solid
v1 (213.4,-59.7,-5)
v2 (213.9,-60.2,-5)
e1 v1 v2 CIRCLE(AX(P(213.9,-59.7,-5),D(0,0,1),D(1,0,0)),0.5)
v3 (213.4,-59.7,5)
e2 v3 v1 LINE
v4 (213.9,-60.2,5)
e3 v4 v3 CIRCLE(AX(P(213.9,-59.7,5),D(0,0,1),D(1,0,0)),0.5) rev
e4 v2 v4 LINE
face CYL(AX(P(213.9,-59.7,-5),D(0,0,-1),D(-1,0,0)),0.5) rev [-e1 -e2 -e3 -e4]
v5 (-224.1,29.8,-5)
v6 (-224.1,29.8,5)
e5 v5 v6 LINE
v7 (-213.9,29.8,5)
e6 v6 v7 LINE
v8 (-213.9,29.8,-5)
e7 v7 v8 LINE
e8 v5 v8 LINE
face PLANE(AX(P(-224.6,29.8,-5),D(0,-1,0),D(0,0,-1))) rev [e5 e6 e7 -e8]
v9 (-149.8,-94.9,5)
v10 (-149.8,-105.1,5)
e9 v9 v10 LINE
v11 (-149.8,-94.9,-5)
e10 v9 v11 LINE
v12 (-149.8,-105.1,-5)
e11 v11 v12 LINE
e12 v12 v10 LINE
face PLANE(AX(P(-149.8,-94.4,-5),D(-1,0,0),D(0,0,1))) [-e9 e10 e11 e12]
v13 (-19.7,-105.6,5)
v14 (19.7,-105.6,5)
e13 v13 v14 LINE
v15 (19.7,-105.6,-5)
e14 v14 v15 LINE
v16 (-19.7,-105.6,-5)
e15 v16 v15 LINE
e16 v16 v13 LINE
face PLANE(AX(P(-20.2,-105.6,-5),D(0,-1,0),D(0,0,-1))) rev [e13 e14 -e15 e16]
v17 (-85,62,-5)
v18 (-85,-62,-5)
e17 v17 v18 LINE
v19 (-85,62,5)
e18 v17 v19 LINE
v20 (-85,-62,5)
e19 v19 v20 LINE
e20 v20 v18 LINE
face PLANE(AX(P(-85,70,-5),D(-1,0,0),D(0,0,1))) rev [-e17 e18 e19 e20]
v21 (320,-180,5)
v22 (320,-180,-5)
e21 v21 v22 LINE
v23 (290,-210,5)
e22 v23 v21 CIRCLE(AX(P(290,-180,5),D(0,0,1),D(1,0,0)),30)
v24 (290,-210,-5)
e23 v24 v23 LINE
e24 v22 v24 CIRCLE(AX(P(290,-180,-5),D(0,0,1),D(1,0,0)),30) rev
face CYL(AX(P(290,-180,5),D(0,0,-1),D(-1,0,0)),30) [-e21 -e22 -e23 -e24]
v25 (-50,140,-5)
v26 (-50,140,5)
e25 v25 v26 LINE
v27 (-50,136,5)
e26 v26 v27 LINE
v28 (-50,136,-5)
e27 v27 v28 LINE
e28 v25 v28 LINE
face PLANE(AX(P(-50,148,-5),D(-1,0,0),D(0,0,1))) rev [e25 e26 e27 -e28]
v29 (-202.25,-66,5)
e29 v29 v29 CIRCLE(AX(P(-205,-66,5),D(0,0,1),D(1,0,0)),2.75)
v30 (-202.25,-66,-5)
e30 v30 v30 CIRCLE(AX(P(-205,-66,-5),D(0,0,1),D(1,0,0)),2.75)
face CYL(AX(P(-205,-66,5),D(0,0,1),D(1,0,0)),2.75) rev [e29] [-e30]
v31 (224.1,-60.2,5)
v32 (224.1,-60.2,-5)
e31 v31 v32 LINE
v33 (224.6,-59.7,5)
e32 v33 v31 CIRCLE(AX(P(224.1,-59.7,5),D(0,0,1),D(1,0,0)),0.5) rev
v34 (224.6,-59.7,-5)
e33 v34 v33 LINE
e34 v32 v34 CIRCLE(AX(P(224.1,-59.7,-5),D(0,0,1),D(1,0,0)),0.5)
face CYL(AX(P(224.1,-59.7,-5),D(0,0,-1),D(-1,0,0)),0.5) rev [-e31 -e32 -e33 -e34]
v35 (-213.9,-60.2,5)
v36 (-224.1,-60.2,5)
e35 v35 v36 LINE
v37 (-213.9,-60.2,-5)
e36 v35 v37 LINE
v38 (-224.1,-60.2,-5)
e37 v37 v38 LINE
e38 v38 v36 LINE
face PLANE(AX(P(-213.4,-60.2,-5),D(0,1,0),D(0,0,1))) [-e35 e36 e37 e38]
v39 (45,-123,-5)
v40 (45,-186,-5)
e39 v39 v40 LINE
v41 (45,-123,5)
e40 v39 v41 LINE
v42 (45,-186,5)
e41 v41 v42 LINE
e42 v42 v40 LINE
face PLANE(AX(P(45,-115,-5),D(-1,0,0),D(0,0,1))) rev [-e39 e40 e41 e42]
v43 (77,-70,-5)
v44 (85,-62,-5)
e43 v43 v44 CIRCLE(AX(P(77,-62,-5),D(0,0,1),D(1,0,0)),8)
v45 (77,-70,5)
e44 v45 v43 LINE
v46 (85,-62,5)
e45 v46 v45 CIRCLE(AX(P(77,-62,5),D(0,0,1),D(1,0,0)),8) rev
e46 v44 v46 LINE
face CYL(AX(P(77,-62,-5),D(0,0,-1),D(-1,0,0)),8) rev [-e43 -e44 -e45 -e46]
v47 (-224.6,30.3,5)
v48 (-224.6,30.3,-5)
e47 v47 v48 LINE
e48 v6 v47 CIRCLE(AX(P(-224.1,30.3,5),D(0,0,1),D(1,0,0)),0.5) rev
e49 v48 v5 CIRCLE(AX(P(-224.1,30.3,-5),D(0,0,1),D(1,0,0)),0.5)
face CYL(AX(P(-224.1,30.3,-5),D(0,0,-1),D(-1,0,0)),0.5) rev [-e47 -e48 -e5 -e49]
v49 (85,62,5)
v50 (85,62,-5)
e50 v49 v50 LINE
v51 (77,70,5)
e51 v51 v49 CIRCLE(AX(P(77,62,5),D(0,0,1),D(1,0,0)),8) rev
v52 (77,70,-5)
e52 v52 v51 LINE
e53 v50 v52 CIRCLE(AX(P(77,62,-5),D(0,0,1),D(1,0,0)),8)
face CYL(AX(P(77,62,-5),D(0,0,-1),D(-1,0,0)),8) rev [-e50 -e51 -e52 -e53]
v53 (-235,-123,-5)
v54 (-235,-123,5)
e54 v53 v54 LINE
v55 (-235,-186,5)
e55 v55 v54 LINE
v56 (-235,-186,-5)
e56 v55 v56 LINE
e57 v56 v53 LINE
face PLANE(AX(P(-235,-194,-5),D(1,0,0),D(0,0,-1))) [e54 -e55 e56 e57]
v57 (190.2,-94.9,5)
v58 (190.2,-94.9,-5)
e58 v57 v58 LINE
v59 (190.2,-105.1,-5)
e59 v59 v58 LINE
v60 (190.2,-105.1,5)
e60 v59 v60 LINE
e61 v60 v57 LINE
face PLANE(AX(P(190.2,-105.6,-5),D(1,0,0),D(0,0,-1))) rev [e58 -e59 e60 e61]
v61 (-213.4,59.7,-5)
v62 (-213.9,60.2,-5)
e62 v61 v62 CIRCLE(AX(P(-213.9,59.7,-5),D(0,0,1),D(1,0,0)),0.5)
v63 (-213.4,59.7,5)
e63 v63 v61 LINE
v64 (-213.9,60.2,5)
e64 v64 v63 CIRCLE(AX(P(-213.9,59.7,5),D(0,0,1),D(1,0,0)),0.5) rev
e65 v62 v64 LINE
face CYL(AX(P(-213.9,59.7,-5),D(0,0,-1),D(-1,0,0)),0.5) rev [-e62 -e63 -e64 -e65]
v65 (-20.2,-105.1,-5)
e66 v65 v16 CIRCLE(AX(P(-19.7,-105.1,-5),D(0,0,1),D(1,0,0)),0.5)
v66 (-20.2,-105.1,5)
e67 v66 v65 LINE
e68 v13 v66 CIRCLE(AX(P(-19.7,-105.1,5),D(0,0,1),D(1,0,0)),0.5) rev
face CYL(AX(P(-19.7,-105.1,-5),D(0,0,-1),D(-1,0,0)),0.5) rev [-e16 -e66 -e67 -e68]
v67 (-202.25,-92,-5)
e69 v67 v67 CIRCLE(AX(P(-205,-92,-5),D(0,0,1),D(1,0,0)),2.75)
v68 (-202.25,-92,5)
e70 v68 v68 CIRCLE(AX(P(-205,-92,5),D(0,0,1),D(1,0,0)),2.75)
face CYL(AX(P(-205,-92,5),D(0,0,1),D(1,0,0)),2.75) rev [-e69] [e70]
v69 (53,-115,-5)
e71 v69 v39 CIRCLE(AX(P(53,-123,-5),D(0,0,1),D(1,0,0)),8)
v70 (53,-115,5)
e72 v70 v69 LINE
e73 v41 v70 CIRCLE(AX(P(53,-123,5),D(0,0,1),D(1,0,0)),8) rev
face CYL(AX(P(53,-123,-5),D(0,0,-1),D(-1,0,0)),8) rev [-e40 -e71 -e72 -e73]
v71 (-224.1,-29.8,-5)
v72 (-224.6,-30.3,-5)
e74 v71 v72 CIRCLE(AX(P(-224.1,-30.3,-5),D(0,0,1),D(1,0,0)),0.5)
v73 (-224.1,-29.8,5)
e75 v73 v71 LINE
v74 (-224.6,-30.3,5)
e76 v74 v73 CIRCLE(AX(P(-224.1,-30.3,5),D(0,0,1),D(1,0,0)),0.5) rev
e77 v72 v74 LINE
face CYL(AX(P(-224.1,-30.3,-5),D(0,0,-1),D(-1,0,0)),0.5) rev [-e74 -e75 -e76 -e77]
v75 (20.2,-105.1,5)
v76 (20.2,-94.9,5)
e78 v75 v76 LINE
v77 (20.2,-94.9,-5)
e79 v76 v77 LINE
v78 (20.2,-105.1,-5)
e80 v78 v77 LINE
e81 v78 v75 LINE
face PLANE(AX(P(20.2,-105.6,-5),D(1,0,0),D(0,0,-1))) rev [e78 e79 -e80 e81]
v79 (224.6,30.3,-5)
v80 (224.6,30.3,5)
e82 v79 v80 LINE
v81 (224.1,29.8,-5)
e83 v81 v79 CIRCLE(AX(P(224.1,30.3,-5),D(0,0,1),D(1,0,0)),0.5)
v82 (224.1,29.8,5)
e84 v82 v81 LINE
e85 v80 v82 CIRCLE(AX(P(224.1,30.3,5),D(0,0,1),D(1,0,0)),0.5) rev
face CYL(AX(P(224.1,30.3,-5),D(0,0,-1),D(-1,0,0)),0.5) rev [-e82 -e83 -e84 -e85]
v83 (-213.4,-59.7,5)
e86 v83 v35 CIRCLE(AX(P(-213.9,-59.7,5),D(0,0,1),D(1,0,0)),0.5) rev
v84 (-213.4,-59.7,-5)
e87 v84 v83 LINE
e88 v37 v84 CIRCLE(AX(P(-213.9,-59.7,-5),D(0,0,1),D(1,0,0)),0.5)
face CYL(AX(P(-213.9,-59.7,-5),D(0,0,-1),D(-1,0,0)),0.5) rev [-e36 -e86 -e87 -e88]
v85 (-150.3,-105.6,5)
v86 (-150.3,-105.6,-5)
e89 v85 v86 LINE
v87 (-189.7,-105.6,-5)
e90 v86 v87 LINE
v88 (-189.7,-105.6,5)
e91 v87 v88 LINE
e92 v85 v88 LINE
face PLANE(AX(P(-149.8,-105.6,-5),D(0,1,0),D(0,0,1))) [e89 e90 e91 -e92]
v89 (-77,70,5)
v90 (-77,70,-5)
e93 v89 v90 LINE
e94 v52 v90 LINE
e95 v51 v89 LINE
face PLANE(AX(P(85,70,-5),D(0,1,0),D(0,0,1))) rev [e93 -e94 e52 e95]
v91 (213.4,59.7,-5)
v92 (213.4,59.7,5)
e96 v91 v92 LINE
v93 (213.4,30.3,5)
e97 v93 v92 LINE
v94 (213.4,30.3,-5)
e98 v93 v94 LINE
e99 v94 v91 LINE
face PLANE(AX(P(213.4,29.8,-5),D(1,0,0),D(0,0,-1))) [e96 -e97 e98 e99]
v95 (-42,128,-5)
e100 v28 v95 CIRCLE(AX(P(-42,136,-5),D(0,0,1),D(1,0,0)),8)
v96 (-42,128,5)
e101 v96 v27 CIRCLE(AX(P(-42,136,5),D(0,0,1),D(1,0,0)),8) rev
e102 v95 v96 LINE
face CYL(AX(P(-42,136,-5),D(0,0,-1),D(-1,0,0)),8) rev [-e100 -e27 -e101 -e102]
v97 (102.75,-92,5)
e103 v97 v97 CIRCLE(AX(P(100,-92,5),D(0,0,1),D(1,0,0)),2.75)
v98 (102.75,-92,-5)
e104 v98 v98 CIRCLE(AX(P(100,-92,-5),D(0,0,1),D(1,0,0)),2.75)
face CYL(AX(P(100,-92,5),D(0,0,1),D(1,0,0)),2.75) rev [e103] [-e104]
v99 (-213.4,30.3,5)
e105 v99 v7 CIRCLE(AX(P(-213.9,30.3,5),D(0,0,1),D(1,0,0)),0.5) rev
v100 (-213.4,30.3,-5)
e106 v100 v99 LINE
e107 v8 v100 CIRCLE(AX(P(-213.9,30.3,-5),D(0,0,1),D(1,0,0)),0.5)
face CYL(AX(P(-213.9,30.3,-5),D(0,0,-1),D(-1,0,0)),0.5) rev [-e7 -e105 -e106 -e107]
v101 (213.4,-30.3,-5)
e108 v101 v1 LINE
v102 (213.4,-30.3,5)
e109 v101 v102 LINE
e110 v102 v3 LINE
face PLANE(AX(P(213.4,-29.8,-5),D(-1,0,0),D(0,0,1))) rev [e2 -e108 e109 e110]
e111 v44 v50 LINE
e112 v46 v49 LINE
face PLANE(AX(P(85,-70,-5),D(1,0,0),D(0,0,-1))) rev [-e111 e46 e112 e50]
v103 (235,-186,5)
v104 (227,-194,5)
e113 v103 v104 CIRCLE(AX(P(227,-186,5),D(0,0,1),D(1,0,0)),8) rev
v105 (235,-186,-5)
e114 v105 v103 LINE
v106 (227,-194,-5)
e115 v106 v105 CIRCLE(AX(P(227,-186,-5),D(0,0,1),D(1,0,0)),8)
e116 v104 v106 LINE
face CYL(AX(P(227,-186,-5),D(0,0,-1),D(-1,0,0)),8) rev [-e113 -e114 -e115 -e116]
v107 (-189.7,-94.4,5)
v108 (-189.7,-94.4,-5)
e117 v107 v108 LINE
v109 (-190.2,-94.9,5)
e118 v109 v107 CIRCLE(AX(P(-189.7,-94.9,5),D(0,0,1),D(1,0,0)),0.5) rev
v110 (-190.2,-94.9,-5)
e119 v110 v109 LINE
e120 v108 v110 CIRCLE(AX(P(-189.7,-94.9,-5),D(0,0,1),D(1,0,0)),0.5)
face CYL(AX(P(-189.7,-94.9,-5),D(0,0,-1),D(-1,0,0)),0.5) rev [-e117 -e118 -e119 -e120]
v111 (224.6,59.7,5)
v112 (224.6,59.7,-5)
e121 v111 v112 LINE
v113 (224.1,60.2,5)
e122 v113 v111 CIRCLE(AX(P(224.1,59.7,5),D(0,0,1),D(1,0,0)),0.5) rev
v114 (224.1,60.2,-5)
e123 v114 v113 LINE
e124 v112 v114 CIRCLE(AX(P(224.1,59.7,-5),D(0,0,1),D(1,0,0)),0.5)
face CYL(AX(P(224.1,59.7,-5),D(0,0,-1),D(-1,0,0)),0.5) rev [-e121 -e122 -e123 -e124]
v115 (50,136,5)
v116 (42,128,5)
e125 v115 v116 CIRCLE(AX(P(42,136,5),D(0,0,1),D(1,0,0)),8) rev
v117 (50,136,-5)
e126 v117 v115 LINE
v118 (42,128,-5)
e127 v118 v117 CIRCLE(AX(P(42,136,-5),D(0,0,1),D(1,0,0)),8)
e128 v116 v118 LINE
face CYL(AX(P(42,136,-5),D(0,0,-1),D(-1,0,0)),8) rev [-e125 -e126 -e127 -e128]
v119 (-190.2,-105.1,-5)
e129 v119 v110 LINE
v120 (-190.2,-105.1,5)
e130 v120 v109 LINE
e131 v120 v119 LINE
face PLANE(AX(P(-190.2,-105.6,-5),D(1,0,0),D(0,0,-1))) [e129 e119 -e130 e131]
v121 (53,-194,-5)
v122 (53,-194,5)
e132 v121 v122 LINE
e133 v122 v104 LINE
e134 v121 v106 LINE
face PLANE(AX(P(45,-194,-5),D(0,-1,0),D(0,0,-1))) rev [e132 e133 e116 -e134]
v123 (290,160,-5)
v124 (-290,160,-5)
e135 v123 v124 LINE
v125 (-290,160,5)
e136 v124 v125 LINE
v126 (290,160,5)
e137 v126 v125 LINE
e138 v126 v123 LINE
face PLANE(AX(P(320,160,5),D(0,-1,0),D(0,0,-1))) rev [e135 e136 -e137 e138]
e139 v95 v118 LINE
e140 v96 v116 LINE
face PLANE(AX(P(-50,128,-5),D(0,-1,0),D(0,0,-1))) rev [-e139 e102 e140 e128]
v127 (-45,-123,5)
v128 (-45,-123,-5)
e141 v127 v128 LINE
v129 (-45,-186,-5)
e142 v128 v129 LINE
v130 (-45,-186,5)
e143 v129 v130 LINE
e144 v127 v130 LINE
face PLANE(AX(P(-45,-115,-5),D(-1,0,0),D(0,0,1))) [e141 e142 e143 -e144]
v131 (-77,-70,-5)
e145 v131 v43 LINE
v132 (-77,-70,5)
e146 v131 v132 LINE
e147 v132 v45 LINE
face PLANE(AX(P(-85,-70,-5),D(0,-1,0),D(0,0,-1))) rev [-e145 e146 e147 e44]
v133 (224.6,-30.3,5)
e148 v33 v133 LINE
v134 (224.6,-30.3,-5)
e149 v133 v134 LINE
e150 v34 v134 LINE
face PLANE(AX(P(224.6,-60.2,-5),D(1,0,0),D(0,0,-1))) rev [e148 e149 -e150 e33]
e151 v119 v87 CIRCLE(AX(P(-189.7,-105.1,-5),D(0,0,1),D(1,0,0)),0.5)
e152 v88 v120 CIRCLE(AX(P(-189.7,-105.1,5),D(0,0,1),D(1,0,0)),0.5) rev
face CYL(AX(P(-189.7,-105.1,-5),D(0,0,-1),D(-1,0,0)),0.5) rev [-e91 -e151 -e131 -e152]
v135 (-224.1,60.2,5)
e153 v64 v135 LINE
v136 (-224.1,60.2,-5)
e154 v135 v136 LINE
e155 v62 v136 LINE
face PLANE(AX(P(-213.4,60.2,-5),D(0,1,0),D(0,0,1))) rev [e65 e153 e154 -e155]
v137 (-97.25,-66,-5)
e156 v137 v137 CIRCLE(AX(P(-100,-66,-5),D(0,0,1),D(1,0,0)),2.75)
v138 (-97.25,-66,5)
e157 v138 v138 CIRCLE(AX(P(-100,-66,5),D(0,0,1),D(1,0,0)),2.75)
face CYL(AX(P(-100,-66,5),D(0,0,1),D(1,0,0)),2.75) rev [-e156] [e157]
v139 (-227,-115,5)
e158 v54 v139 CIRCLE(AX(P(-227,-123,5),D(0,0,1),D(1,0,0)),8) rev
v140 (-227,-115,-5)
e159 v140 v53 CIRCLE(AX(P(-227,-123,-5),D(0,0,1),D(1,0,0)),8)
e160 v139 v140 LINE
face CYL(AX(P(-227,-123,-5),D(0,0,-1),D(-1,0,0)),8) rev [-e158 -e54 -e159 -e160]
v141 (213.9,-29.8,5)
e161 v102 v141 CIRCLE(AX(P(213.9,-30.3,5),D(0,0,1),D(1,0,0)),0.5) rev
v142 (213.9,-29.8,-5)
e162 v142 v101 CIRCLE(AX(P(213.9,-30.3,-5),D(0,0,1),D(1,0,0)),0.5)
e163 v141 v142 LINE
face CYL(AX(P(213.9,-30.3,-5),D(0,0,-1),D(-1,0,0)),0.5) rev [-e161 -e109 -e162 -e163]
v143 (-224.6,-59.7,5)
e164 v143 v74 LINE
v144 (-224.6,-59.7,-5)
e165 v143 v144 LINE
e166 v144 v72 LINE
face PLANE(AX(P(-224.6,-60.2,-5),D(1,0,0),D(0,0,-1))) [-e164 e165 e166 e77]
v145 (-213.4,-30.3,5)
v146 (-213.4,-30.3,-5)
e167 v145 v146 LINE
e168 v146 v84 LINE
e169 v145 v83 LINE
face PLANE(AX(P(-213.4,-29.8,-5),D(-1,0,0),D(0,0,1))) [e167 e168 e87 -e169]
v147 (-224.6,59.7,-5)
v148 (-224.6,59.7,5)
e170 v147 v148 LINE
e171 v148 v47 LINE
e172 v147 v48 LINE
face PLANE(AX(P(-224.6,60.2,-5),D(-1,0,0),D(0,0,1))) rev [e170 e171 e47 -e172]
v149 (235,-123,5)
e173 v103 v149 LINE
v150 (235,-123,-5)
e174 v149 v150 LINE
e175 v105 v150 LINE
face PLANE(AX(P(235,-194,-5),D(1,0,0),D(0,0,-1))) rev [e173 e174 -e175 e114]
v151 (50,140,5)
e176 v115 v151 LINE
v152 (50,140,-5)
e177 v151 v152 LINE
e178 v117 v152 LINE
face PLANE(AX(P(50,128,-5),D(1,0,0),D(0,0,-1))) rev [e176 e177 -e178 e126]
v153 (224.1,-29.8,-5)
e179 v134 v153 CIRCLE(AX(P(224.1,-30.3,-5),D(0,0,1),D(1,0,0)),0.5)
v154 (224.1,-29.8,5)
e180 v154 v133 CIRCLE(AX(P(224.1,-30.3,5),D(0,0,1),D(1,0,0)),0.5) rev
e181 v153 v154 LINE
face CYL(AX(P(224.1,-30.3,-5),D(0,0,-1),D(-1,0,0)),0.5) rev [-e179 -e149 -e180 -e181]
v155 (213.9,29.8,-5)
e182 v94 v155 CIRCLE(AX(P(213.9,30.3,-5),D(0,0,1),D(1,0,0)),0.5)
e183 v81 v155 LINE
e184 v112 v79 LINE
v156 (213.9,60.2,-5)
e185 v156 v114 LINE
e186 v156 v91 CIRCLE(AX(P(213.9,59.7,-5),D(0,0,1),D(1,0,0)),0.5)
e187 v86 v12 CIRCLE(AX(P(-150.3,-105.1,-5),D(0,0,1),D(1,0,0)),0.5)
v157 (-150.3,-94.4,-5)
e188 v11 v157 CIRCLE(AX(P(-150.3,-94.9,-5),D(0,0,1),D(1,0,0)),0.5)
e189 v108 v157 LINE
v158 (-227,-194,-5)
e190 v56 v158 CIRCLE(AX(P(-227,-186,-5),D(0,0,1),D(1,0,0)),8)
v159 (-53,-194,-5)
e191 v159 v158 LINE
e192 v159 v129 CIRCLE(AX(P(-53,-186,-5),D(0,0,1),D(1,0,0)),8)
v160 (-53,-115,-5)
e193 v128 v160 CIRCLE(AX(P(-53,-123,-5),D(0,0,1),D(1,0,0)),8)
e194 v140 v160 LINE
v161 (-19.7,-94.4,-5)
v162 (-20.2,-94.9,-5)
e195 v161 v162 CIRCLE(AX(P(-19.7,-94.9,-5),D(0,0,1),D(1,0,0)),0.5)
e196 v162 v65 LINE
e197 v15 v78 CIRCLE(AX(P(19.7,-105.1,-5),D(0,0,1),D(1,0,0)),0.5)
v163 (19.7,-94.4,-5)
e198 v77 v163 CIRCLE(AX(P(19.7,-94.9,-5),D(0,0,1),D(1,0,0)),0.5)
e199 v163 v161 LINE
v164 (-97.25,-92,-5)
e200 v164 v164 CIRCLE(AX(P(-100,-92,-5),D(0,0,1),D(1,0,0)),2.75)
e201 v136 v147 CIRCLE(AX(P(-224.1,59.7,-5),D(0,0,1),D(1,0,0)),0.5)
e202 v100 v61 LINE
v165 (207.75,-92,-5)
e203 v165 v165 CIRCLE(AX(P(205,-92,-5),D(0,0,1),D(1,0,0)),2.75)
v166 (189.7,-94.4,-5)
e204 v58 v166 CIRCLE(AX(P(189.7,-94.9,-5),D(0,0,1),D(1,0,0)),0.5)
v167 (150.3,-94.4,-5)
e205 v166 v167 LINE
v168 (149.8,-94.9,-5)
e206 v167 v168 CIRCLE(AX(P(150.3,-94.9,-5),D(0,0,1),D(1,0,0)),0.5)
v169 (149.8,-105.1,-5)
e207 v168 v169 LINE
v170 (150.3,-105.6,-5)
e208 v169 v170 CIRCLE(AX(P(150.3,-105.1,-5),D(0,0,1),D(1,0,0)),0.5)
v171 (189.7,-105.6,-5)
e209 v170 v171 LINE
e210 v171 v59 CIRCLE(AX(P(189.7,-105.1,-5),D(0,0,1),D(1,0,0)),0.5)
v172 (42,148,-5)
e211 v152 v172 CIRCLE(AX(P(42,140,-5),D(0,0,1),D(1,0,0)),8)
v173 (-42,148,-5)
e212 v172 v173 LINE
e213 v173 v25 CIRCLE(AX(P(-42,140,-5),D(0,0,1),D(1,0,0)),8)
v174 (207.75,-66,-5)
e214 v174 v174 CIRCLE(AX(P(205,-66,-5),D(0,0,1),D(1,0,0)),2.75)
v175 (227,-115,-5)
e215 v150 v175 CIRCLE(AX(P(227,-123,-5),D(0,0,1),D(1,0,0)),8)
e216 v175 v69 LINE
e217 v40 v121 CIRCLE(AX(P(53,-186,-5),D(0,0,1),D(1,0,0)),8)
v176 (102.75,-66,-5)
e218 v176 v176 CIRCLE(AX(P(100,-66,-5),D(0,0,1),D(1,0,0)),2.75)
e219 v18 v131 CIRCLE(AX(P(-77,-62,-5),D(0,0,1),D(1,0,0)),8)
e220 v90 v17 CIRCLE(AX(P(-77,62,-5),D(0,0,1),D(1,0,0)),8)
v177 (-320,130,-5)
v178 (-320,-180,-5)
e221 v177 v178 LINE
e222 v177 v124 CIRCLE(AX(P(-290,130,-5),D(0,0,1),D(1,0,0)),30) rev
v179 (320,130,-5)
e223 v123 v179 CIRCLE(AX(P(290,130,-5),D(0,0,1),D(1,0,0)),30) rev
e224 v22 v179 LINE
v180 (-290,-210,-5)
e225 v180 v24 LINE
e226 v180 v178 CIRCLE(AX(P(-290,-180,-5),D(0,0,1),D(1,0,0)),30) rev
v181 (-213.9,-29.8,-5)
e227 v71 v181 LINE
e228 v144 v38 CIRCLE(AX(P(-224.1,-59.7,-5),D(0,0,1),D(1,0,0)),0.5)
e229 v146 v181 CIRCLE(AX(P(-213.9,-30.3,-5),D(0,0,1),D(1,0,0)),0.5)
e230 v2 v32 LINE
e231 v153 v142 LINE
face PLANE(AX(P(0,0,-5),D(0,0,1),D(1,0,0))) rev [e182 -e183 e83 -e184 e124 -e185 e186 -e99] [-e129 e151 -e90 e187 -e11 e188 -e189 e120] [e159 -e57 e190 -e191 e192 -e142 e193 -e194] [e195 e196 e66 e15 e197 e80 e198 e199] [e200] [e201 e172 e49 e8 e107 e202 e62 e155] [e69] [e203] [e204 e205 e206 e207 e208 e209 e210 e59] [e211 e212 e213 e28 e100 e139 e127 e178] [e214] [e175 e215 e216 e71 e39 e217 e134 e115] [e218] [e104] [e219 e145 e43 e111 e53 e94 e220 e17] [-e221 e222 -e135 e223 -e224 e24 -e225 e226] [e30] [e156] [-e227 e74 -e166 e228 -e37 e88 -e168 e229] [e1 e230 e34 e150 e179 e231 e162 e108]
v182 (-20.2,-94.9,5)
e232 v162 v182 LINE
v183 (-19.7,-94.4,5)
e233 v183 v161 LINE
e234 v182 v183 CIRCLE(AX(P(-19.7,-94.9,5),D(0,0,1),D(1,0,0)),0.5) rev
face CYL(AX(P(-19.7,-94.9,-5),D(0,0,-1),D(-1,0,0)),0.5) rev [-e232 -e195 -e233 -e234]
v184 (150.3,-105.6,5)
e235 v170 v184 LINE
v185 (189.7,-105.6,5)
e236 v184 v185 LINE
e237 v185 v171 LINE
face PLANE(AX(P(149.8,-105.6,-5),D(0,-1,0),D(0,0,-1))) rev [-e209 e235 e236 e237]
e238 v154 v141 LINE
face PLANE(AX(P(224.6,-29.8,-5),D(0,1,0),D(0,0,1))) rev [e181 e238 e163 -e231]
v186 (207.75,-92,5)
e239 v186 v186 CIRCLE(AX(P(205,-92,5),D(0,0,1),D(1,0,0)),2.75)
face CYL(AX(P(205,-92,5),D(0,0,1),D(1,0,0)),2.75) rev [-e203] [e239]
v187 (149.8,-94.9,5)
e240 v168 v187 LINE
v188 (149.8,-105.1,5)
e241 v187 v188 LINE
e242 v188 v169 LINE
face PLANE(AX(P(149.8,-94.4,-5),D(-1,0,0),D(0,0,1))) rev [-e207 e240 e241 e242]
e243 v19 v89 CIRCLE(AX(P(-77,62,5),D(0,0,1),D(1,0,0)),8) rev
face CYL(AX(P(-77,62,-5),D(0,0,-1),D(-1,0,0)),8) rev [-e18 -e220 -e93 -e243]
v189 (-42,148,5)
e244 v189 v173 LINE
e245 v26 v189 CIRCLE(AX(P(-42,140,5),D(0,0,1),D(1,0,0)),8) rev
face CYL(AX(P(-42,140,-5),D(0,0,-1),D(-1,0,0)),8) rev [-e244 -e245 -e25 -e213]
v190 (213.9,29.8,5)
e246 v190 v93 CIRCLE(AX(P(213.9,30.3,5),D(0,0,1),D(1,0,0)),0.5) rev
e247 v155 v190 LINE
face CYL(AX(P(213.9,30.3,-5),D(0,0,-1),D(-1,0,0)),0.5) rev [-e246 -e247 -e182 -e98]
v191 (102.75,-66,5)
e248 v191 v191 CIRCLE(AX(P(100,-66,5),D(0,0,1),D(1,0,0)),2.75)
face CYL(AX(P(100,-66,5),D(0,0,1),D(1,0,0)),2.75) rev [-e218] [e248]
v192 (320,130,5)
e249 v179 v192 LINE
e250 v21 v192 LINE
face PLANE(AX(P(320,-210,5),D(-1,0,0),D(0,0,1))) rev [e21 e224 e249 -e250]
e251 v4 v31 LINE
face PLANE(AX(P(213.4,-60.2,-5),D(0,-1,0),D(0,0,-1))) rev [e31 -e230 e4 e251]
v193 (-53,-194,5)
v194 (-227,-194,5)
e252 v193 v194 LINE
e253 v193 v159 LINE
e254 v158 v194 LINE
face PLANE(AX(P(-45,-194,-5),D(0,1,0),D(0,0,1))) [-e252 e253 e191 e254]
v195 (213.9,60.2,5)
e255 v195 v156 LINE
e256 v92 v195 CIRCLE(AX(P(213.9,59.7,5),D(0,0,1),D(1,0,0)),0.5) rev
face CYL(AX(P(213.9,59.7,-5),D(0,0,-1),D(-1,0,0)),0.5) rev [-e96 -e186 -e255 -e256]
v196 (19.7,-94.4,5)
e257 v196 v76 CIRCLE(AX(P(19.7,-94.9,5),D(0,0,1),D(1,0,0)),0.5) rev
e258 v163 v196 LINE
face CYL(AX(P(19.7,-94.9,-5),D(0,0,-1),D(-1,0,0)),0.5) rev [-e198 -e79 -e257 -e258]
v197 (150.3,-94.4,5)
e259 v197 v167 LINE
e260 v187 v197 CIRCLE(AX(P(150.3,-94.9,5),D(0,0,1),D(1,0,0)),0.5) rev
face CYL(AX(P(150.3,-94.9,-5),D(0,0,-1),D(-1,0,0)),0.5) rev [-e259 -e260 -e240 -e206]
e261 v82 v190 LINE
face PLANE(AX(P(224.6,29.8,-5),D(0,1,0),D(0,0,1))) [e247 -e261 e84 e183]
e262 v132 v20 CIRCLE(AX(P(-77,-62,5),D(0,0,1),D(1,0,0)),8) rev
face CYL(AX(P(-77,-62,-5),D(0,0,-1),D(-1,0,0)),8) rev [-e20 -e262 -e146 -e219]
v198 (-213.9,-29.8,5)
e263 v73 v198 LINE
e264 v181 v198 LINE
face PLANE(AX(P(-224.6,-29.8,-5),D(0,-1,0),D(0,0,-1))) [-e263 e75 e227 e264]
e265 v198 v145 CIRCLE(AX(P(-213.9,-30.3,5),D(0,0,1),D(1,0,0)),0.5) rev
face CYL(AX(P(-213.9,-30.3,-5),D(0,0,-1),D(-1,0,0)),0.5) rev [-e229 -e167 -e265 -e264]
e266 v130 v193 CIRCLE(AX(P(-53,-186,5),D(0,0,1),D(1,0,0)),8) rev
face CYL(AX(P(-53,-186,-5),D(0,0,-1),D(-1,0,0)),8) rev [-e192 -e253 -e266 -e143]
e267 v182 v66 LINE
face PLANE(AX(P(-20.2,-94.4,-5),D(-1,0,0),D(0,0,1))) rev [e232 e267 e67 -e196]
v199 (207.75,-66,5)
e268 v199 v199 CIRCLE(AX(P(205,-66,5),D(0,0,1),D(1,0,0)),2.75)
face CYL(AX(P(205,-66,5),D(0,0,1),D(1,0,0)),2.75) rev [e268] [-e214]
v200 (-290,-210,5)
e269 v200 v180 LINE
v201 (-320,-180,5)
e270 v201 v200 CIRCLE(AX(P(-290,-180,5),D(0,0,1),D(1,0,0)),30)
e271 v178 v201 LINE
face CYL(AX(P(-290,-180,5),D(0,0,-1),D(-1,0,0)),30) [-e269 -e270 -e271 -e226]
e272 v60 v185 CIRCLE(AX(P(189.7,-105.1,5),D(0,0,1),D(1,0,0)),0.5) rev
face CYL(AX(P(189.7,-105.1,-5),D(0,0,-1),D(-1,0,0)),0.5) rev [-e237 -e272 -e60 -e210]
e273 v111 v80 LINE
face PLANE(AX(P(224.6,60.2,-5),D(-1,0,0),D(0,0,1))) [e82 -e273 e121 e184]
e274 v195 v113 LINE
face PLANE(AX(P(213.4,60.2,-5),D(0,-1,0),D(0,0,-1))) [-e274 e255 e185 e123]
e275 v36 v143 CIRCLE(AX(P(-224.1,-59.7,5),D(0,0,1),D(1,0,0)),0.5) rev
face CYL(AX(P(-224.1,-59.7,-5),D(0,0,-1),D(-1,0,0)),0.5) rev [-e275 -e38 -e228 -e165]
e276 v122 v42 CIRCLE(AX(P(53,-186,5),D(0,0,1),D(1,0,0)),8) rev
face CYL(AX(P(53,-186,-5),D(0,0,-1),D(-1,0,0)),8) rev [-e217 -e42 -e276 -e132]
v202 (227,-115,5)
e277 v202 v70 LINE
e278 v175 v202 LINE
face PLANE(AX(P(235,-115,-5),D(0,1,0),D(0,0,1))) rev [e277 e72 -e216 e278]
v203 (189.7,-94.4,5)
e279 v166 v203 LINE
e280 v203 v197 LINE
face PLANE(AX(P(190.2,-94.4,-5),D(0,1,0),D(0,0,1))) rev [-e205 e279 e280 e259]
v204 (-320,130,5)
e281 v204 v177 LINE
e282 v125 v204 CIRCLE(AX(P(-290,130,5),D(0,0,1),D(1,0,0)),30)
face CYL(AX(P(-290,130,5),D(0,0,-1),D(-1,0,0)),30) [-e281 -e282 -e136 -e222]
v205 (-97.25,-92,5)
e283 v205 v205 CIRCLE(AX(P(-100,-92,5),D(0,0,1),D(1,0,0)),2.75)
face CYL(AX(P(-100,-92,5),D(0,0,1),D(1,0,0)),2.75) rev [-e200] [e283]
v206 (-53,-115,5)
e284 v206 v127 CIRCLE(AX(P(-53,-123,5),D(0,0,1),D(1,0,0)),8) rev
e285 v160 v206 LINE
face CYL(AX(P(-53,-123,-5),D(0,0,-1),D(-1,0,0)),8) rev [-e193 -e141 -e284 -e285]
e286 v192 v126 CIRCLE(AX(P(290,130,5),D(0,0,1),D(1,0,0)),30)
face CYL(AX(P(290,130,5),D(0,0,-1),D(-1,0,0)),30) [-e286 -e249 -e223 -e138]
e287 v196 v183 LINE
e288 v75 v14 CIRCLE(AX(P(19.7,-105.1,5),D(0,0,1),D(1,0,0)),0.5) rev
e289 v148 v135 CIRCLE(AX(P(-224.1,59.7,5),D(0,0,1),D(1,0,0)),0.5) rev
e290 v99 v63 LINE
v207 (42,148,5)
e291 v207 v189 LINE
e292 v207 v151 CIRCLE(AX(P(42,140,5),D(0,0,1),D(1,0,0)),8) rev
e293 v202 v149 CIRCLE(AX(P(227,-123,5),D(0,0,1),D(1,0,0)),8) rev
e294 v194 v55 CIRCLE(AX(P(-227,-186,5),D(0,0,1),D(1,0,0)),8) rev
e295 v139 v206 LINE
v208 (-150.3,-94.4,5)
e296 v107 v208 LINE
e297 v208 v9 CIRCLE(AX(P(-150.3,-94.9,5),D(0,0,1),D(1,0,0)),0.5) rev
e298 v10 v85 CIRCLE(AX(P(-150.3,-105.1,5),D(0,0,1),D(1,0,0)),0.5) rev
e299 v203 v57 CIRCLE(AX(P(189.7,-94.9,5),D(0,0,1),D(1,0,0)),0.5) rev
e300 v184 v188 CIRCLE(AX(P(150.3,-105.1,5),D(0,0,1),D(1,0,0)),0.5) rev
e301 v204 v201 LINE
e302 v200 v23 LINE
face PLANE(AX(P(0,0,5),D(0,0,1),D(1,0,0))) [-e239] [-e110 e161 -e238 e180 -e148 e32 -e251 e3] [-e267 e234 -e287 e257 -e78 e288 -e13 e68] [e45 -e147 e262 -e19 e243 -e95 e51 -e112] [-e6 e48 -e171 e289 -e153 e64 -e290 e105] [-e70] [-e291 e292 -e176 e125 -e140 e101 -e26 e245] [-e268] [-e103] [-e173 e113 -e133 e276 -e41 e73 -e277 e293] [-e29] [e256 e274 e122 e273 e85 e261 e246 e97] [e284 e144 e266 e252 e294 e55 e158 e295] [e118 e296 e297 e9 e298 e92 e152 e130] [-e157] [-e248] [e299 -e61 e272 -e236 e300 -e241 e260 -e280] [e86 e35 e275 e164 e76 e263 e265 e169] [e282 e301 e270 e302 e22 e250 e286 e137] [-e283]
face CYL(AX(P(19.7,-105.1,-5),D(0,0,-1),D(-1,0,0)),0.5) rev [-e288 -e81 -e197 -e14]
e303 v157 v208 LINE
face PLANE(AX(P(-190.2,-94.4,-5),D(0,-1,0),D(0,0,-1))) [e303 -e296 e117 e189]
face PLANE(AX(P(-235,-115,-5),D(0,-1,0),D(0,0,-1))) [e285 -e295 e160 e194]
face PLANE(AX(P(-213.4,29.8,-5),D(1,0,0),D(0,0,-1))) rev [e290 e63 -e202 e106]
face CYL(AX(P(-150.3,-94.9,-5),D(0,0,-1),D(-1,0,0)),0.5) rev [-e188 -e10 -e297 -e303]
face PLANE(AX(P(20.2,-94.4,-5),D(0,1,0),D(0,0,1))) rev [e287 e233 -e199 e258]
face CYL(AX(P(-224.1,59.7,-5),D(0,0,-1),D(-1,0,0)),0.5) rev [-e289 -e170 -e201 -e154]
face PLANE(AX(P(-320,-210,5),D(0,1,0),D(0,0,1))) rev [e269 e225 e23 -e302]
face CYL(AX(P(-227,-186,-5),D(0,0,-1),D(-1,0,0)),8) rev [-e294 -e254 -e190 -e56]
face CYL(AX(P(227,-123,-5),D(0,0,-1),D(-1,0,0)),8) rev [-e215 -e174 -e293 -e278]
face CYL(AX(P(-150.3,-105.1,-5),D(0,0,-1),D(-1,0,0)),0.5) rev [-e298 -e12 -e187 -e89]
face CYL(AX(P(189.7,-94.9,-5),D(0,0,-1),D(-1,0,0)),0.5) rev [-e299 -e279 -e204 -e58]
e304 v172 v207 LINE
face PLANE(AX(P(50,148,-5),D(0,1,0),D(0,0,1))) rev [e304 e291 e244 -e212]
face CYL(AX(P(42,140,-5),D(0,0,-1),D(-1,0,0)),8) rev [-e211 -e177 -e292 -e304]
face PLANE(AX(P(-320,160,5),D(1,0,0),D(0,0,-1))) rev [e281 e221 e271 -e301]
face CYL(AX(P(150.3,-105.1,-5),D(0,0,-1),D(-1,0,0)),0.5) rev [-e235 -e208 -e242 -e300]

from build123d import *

# Parameters (mm, degrees)
SKETCH_1_W                  = 640
SKETCH_1_H                  = 370
EXTRUDE_1618_DEPTH          = 5
SKETCH_2_W                  = 190
SKETCH_2_H                  = 79
CUT_EXTRUDE_1669_DEPTH      = 383.785840908
FILLET_R_R                  = 8
FILLET_R_OF_MIRROR_1948_R   = 8
CUT_EXTRUDE_1976_DEPTH      = 383.785840908
CUT_EXTRUDE_1976_DEPTH_BACK = 383.785840908
SKETCH_3_W                  = 170
SKETCH_3_H                  = 140
FILLET_R_2_R                = 8
SKETCH_4_W                  = 11.2
SKETCH_4_H                  = 30.4
CUT_EXTRUDE_2232_DEPTH      = 383.785840908
FILLET_R_3_R                = 0.5
FILLET_R_3_OF_MIRROR_2515_R = 0.5
MIRROR_START                = -5
MIRROR_2537_DEPTH           = 10
CUT_EXTRUDE_2565_DEPTH      = 383.785840908
CUT_EXTRUDE_2565_DEPTH_BACK = 383.785840908
SKETCH_5_W                  = 40.4
SKETCH_5_H                  = 11.2
FILLET_R_4_R                = 0.5
SKETCH_6_W                  = 40.4
SKETCH_6_H                  = 11.2
CUT_EXTRUDE_2821_DEPTH      = 383.785840908
FILLET_R_5_R                = 0.5
FILLET_R_5_OF_MIRROR_3088_R = 0.5
CUT_EXTRUDE_3116_DEPTH      = 383.785840908
CUT_EXTRUDE_3116_DEPTH_BACK = 383.785840908
SKETCH_7_W                  = 100
SKETCH_7_H                  = 20
FILLET_R_6_R                = 8
HOLE_WIZARD_3368_D          = 5.5
HOLE_WIZARD_3368_DEPTH      = 10
HOLE_WIZARD_3368_TIP        = 1.652366702
FILLET_R_7_R                = 30


# Read off the part's stored shape, not the designer's step: 角穴 筒受け・筒押え(後)
with BuildPart() as part:
    # ｽｹｯﾁ1 → Extrude 1618 (new, symmetric)
    with BuildSketch(Plane.XY):
        with Locations((0, -25)):
            Rectangle(SKETCH_1_W, SKETCH_1_H)
    extrude(amount=EXTRUDE_1618_DEPTH, both=True)

    # ｽｹｯﾁ2 → Cut-Extrude 1669 (cut, symmetric)
    with BuildSketch(Plane.XY):
        with Locations((140, -154.5)):
            Rectangle(SKETCH_2_W, SKETCH_2_H)
    cut_extrude_1669 = extrude(amount=CUT_EXTRUDE_1669_DEPTH, both=True, mode=Mode.SUBTRACT)

    # Fillet R
    fillet_r_edges = [part.edges().sort_by_distance(p)[0] for p in [
        (45, -194, 0),
        (45, -115, 0),
        (235, -115, 0),
        (235, -194, 0),
    ]]
    fillet(fillet_r_edges, radius=FILLET_R_R)

    # Mirror 1948: Cut-Extrude 1669 across plane
    add(cut_extrude_1669.mirror(Plane(origin=(0, 0, 0), x_dir=(0, 0, 1), z_dir=(1, 0, 0))), mode=Mode.SUBTRACT)

    # Fillet R of Mirror 1948
    fillet_r_of_mirror_1948_edges = [part.edges().sort_by_distance(p)[0] for p in [
        (-45, -194, 0),
        (-45, -115, 0),
        (-235, -115, 0),
        (-235, -194, 0),
    ]]
    fillet(fillet_r_of_mirror_1948_edges, radius=FILLET_R_OF_MIRROR_1948_R)

    # ｽｹｯﾁ3 → Cut-Extrude 1976 (cut, two sides: drawn at the far end of the back side and taken through both)
    with BuildSketch(Plane.XY.offset(-CUT_EXTRUDE_1976_DEPTH_BACK)):
        Rectangle(SKETCH_3_W, SKETCH_3_H)
    extrude(amount=CUT_EXTRUDE_1976_DEPTH + CUT_EXTRUDE_1976_DEPTH_BACK, mode=Mode.SUBTRACT)

    # Fillet R 2
    fillet_r_2_edges = [part.edges().sort_by_distance(p)[0] for p in [
        (-85, -70, 0),
        (-85, 70, 0),
        (85, 70, 0),
        (85, -70, 0),
    ]]
    fillet(fillet_r_2_edges, radius=FILLET_R_2_R)

    # ｽｹｯﾁ4 → Cut-Extrude 2232 (cut, symmetric)
    with BuildSketch(Plane.XY):
        with Locations((219, -45)):
            Rectangle(SKETCH_4_W, SKETCH_4_H)
    cut_extrude_2232 = extrude(amount=CUT_EXTRUDE_2232_DEPTH, both=True, mode=Mode.SUBTRACT)

    # Fillet R 3
    fillet_r_3_edges = [part.edges().sort_by_distance(p)[0] for p in [
        (213.4, -60.2, 0),
        (213.4, -29.8, 0),
        (224.6, -29.8, 0),
        (224.6, -60.2, 0),
    ]]
    fillet(fillet_r_3_edges, radius=FILLET_R_3_R)

    # Mirror 2515: Cut-Extrude 2232 across plane
    add(cut_extrude_2232.mirror(Plane.ZX), mode=Mode.SUBTRACT)

    # Fillet R 3 of Mirror 2515
    fillet_r_3_of_mirror_2515_edges = [part.edges().sort_by_distance(p)[0] for p in [
        (213.4, 60.2, 0),
        (213.4, 29.8, 0),
        (224.6, 29.8, 0),
        (224.6, 60.2, 0),
    ]]
    fillet(fillet_r_3_of_mirror_2515_edges, radius=FILLET_R_3_OF_MIRROR_2515_R)

    # Mirror 2537 outline → Mirror 2537 (cut)
    with BuildSketch(Plane.XY.offset(MIRROR_START)):
        with BuildLine():
            Line((-213.9, -29.8), (-224.1, -29.8))
            ThreePointArc((-224.1, -29.8), (-224.453553391, -29.946446609), (-224.6, -30.3))
            Line((-224.6, -30.3), (-224.6, -59.7))
            ThreePointArc((-224.6, -59.7), (-224.453553391, -60.053553391), (-224.1, -60.2))
            Line((-224.1, -60.2), (-213.9, -60.2))
            ThreePointArc((-213.9, -60.2), (-213.546446609, -60.053553391), (-213.4, -59.7))
            Line((-213.4, -59.7), (-213.4, -30.3))
            ThreePointArc((-213.4, -30.3), (-213.546446609, -29.946446609), (-213.9, -29.8))
        make_face()
        with BuildLine():
            ThreePointArc((-213.4, 59.7), (-213.546446609, 60.053553391), (-213.9, 60.2))
            Line((-213.9, 60.2), (-224.1, 60.2))
            ThreePointArc((-224.1, 60.2), (-224.453553391, 60.053553391), (-224.6, 59.7))
            Line((-224.6, 59.7), (-224.6, 30.3))
            ThreePointArc((-224.6, 30.3), (-224.453553391, 29.946446609), (-224.1, 29.8))
            Line((-224.1, 29.8), (-213.9, 29.8))
            ThreePointArc((-213.9, 29.8), (-213.546446609, 29.946446609), (-213.4, 30.3))
            Line((-213.4, 30.3), (-213.4, 59.7))
        make_face()
    extrude(amount=MIRROR_2537_DEPTH, mode=Mode.SUBTRACT)

    # ｽｹｯﾁ5 → Cut-Extrude 2565 (cut, two sides: drawn at the far end of the back side and taken through both)
    with BuildSketch(Plane.XY.offset(-CUT_EXTRUDE_2565_DEPTH_BACK)):
        with Locations((0, -100)):
            Rectangle(SKETCH_5_W, SKETCH_5_H)
    extrude(amount=CUT_EXTRUDE_2565_DEPTH + CUT_EXTRUDE_2565_DEPTH_BACK, mode=Mode.SUBTRACT)

    # Fillet R 4
    fillet_r_4_edges = [part.edges().sort_by_distance(p)[0] for p in [
        (-20.2, -105.6, 0),
        (-20.2, -94.4, 0),
        (20.2, -94.4, 0),
        (20.2, -105.6, 0),
    ]]
    fillet(fillet_r_4_edges, radius=FILLET_R_4_R)

    # ｽｹｯﾁ6 → Cut-Extrude 2821 (cut, symmetric)
    with BuildSketch(Plane.XY):
        with Locations((170, -100)):
            Rectangle(SKETCH_6_W, SKETCH_6_H)
    cut_extrude_2821 = extrude(amount=CUT_EXTRUDE_2821_DEPTH, both=True, mode=Mode.SUBTRACT)

    # Fillet R 5
    fillet_r_5_edges = [part.edges().sort_by_distance(p)[0] for p in [
        (149.8, -105.6, 0),
        (149.8, -94.4, 0),
        (190.2, -94.4, 0),
        (190.2, -105.6, 0),
    ]]
    fillet(fillet_r_5_edges, radius=FILLET_R_5_R)

    # Mirror 3088: Cut-Extrude 2821 across plane
    add(cut_extrude_2821.mirror(Plane(origin=(0, 0, 0), x_dir=(0, 0, 1), z_dir=(1, 0, 0))), mode=Mode.SUBTRACT)

    # Fillet R 5 of Mirror 3088
    fillet_r_5_of_mirror_3088_edges = [part.edges().sort_by_distance(p)[0] for p in [
        (-149.8, -105.6, 0),
        (-149.8, -94.4, 0),
        (-190.2, -94.4, 0),
        (-190.2, -105.6, 0),
    ]]
    fillet(fillet_r_5_of_mirror_3088_edges, radius=FILLET_R_5_OF_MIRROR_3088_R)

    # ｽｹｯﾁ7 → Cut-Extrude 3116 (cut, two sides: drawn at the far end of the back side and taken through both)
    with BuildSketch(Plane.XY.offset(-CUT_EXTRUDE_3116_DEPTH_BACK)):
        with Locations((0, 138)):
            Rectangle(SKETCH_7_W, SKETCH_7_H)
    extrude(amount=CUT_EXTRUDE_3116_DEPTH + CUT_EXTRUDE_3116_DEPTH_BACK, mode=Mode.SUBTRACT)

    # Fillet R 6
    fillet_r_6_edges = [part.edges().sort_by_distance(p)[0] for p in [
        (-50, 128, 0),
        (-50, 148, 0),
        (50, 148, 0),
        (50, 128, 0),
    ]]
    fillet(fillet_r_6_edges, radius=FILLET_R_6_R)

    # Hole Wizard 3368
    with Locations(Plane.XY.offset(5)):
        with Locations((100, -66), (100, -92), (-100, -66), (-100, -92), (205, -66), (205, -92), (-205, -66), (-205, -92)):
            Hole(HOLE_WIZARD_3368_D / 2, depth=HOLE_WIZARD_3368_DEPTH)
            with Locations((0, 0, -(HOLE_WIZARD_3368_DEPTH + HOLE_WIZARD_3368_TIP / 2))):  # 118° drill point
                Cone(0, HOLE_WIZARD_3368_D / 2, HOLE_WIZARD_3368_TIP, mode=Mode.SUBTRACT)

    # Fillet R 7
    fillet_r_7_edges = [part.edges().sort_by_distance(p)[0] for p in [
        (-320, 160, 0),
        (320, 160, 0),
        (320, -210, 0),
        (-320, -210, 0),
    ]]
    fillet(fillet_r_7_edges, radius=FILLET_R_7_R)


solid = part.part
